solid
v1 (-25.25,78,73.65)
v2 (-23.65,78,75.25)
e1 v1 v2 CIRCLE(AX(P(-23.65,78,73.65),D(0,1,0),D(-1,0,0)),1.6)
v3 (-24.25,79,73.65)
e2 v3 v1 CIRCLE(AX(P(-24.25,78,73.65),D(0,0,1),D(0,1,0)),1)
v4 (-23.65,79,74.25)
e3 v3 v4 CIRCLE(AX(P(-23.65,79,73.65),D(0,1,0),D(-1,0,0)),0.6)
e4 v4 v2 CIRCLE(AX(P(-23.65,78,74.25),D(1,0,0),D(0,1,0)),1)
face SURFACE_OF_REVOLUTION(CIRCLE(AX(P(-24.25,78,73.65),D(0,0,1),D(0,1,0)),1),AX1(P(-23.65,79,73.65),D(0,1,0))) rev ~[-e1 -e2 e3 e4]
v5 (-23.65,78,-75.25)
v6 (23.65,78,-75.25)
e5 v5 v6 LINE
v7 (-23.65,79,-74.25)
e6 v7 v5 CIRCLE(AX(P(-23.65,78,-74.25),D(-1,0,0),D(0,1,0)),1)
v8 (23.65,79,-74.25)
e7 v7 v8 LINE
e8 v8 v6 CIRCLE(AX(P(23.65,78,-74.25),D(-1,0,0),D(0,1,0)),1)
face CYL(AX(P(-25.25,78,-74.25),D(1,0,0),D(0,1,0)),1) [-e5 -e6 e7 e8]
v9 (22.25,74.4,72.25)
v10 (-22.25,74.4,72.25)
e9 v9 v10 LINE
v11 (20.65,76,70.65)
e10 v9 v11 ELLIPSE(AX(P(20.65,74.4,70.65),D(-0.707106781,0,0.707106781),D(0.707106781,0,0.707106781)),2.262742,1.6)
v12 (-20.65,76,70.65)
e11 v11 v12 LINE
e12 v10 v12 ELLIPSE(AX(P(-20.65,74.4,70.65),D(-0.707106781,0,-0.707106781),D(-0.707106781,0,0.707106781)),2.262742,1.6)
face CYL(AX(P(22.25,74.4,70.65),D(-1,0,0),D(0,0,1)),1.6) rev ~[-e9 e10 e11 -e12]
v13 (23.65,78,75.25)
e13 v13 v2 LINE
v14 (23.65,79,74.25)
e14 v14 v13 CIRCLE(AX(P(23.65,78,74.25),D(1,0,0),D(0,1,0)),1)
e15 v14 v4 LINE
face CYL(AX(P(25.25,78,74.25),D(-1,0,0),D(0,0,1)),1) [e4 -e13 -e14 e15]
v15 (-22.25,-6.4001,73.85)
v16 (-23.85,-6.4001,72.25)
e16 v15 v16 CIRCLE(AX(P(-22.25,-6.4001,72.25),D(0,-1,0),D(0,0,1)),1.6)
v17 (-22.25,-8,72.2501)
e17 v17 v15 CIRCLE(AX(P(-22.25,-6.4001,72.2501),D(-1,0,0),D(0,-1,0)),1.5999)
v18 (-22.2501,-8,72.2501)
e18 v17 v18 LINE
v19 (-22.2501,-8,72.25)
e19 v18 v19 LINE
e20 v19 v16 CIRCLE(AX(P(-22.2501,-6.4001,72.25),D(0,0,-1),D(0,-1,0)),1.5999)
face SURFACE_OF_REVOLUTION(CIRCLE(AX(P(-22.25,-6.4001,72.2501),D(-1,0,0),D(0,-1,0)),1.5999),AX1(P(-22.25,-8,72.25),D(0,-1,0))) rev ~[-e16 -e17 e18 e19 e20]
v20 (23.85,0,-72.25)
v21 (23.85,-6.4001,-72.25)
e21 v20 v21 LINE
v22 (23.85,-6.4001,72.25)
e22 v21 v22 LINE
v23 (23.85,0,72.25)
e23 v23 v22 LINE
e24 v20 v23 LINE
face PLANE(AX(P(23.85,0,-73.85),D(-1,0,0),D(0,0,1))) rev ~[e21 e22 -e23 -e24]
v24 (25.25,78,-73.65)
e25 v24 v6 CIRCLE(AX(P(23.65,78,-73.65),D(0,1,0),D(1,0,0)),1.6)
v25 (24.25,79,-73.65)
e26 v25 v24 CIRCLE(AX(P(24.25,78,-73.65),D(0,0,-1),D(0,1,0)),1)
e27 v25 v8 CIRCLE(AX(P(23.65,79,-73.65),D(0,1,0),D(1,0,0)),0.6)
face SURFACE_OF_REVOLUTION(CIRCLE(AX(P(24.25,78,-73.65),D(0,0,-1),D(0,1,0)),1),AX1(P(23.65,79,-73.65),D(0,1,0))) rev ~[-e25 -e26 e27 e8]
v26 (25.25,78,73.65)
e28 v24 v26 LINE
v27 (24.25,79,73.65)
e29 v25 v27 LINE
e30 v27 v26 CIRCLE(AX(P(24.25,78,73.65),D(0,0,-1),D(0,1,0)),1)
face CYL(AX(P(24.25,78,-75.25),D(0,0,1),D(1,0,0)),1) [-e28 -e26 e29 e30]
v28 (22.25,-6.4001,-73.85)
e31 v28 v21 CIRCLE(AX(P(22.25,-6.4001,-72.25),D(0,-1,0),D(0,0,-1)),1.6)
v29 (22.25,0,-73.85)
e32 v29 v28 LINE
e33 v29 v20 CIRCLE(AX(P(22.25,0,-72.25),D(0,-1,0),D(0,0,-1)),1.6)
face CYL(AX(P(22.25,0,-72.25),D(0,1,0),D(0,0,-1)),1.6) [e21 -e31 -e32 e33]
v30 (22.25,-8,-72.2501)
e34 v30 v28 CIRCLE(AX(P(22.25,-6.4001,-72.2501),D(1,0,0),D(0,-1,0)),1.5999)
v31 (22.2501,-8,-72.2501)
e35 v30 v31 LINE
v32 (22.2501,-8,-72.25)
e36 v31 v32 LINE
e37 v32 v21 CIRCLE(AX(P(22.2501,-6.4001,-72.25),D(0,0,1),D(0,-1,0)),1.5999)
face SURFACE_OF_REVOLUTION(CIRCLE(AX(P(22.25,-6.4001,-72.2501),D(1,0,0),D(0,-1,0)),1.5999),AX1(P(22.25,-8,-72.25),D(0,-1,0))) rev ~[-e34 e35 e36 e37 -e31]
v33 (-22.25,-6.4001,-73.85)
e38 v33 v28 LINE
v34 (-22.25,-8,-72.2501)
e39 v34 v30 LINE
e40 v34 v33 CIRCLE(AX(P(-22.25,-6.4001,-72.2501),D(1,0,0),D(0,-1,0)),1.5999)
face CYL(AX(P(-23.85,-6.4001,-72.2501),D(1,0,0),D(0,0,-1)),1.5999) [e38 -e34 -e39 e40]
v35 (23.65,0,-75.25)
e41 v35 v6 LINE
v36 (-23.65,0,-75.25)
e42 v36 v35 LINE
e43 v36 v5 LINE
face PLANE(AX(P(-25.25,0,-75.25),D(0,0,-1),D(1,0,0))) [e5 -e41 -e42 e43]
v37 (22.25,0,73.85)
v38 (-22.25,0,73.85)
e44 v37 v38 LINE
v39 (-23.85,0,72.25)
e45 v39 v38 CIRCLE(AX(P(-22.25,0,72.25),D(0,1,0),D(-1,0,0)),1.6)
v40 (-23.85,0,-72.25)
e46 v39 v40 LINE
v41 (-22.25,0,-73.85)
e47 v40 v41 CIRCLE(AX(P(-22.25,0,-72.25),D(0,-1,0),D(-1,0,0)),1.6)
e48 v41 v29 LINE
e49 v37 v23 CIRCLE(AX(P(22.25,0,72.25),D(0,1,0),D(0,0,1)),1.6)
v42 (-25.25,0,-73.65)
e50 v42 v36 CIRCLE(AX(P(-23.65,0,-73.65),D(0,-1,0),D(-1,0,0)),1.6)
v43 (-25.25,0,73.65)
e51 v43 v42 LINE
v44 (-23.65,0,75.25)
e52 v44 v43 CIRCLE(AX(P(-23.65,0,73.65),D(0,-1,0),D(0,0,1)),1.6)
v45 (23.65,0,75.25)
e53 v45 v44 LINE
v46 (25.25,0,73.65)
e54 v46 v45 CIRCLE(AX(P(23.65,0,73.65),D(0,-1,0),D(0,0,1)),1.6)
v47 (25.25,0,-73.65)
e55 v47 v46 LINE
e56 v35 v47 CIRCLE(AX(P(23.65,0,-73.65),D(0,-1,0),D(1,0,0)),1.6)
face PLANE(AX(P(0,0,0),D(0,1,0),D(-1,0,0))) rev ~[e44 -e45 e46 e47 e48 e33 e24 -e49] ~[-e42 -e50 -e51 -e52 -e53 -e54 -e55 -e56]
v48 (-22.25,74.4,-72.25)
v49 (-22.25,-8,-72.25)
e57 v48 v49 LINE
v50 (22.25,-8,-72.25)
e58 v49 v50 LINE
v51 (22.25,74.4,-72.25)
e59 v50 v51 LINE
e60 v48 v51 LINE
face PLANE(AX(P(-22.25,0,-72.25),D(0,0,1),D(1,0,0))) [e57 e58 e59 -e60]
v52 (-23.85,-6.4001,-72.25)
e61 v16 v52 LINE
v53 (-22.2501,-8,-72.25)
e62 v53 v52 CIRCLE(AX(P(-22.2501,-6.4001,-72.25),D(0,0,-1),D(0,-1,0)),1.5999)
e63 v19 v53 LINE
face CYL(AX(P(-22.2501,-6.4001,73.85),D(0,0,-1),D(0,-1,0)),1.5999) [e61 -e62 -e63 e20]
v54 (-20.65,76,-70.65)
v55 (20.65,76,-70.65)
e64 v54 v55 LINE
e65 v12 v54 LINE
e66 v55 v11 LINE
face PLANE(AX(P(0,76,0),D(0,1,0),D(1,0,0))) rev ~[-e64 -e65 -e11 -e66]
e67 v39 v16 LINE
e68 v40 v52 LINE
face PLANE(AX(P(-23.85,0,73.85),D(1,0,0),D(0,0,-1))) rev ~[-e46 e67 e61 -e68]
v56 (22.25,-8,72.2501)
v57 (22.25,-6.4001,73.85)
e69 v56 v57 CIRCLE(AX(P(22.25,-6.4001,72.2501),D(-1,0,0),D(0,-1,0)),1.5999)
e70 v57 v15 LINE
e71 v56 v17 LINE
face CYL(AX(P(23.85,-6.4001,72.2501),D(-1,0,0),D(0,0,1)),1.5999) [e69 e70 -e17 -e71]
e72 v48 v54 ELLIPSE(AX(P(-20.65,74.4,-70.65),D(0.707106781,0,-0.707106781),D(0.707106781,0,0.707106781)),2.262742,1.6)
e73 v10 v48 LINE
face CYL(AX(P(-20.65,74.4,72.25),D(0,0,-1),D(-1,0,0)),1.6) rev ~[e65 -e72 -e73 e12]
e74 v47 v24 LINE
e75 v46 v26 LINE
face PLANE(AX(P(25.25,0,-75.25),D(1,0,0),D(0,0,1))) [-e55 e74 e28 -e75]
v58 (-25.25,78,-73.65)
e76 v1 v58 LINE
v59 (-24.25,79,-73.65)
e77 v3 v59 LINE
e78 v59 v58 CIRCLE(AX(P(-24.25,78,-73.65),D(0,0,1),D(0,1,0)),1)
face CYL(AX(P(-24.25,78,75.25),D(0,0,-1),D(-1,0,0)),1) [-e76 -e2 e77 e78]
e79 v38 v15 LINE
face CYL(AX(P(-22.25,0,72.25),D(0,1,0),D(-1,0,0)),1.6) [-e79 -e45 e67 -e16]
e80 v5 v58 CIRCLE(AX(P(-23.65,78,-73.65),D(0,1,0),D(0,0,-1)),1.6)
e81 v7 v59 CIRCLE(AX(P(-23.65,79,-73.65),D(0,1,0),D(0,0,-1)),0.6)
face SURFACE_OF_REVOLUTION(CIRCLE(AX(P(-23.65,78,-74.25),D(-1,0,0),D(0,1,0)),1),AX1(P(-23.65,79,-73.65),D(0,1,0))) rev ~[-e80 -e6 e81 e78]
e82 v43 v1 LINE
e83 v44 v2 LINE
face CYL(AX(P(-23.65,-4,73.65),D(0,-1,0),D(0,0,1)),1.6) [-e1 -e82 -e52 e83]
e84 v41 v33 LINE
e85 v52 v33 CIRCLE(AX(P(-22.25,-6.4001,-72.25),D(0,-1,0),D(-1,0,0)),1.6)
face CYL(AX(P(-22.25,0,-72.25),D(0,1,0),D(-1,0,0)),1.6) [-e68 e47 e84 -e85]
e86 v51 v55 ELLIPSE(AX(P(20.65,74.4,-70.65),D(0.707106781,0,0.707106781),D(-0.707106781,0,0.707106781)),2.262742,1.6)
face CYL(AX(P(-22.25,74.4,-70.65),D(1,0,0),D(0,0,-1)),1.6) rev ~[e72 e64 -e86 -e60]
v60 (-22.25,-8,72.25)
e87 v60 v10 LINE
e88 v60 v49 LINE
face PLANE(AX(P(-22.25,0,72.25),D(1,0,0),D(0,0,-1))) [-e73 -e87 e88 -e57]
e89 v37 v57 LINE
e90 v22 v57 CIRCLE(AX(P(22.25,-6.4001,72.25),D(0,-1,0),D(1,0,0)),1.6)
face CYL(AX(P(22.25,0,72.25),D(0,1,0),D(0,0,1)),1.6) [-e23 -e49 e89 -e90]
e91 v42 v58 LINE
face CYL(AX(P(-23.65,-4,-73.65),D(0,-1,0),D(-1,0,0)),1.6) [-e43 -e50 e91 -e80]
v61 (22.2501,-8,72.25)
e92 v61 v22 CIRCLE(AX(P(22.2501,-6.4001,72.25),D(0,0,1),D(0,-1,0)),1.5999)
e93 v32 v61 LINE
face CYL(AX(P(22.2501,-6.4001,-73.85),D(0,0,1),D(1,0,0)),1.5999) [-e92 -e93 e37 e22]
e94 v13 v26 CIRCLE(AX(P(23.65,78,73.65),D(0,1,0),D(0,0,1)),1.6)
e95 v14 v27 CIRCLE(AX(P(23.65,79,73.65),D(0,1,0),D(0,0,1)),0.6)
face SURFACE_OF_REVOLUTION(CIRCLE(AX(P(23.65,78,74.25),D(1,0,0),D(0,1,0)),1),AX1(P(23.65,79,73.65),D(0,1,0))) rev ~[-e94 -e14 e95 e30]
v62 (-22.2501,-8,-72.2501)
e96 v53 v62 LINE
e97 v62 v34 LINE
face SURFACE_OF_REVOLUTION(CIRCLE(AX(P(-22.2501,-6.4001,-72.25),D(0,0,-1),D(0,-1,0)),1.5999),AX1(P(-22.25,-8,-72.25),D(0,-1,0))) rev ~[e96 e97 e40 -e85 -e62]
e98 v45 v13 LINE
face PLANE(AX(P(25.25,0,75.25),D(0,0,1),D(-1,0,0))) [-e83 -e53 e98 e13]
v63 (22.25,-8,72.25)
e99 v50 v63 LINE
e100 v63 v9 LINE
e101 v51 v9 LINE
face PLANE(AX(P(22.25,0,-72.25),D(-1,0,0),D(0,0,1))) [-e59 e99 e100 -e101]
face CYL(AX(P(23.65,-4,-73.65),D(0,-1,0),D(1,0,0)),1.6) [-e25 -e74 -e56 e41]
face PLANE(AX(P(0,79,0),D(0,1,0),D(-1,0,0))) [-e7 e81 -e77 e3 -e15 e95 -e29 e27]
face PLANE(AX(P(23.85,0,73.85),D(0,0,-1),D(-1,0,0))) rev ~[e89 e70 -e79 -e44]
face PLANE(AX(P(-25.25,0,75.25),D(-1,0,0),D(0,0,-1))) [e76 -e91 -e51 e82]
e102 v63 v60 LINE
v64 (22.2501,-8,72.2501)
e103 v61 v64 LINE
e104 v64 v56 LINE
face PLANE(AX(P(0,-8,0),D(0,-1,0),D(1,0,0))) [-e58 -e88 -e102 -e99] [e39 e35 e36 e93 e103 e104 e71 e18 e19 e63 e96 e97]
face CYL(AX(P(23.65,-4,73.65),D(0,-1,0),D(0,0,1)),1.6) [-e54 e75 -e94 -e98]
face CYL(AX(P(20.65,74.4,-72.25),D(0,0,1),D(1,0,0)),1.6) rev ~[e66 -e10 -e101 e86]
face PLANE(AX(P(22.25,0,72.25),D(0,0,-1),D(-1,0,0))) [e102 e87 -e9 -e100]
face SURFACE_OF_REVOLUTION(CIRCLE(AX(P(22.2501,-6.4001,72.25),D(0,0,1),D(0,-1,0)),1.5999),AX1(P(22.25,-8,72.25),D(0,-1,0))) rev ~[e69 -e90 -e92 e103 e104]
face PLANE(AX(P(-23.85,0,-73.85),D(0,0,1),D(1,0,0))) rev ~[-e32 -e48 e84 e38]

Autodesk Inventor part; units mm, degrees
ref_plane "YZ Plane" through (0, 0, 0) normal (1, 0, 0) x (0, 1, 0)
ref_plane "XZ Plane" through (0, 0, 0) normal (0, 1, 0) x (-1, 0, 0)
ref_plane "XY Plane" through (0, 0, 0) normal (0, 0, 1) x (1, 0, 0)
sketch "Boceto1" plane through (0, 0, 0) normal (0, 1, 0) x (-1, 0, 0)
  line L0 (-25.25, 75.25) -> (25.25, 75.25)
  line L1 (25.25, 75.25) -> (25.25, -75.25)
  line L2 (25.25, -75.25) -> (-25.25, -75.25)
  line L3 (-25.25, -75.25) -> (-25.25, 75.25)
  line L4 (-25.25, 75.25) -> (25.25, -75.25) construction
  line L5 (25.25, 75.25) -> (-25.25, -75.25) construction
  line L6 (22.25, -72.25) -> (22.25, 72.25)
  line L7 (22.25, 72.25) -> (-22.25, 72.25)
  line L8 (-22.25, 72.25) -> (-22.25, -72.25)
  line L9 (-22.25, -72.25) -> (22.25, -72.25)
  point P0 (0, 0)
  dimension "d0" = 50.5
  dimension "d1" = 150.5
  dimension "d2" = 3
  dimension "d3" = 44.5
extrude "Extrusión1" add sketch "Boceto1" along normal blind 79
sketch "Boceto2" plane through (0, 79, 0) normal (0, 1, 0) x (1, 0, 0)
  line L0 (-22.25, -72.25) -> (-22.25, 72.25) projected
  line L1 (25.25, 75.25) -> (-25.25, 75.25) projected
  line L2 (-25.25, 75.25) -> (-25.25, -75.25) projected
  line L3 (-25.25, -75.25) -> (25.25, -75.25) projected
  line L4 (25.25, -75.25) -> (25.25, 75.25) projected
  line L5 (-22.25, 72.25) -> (22.25, 72.25) projected
  line L6 (22.25, 72.25) -> (22.25, -72.25) projected
  line L7 (22.25, -72.25) -> (-22.25, -72.25) projected
  line L8 (-22.25, -72.25) -> (-22.25, 72.25) projected
  point P0 (0, 0)
  point P1 (-22.25, 72.25)
extrude "Extrusión2" add sketch "Boceto2" against normal blind 3 contours L0 L5 L6 L7
fillet "Empalme1" radius 1 4 edges at (0, 79, 75.25) (25.25, 79, 0) (-25.25, 79, 0) (0, 79, -75.25)
sketch "Boceto3" plane through (0, 0, 0) normal (0, -1, 0) x (1, 0, 0)
  line L0 (25.25, -75.25) -> (-25.25, -75.25) projected
  line L1 (25.25, 75.25) -> (25.25, -75.25) projected
  line L2 (-25.25, 75.25) -> (25.25, 75.25) projected
  line L3 (-25.25, -75.25) -> (-25.25, 75.25) projected
  line L4 (-22.25, -72.25) -> (22.25, -72.25) projected
  line L5 (-22.25, 72.25) -> (-22.25, -72.25) projected
  line L6 (22.25, 72.25) -> (-22.25, 72.25) projected
  line L7 (22.25, -72.25) -> (22.25, 72.25) projected
  line L8 (23.85, 73.85) -> (-23.85, 73.85)
  line L9 (-23.85, 73.85) -> (-23.85, -73.85)
  line L10 (-23.85, -73.85) -> (23.85, -73.85)
  line L11 (23.85, -73.85) -> (23.85, 73.85)
  point P0 (0, 0)
  dimension "d9" = 1.6
extrude "Extrusión3" add sketch "Boceto3" along normal blind 8 contours L11 L10 L9 L8
fillet "Empalme2" radius 1.6 4 edges at (-23.85, -8, 0) (0, -8, 73.85) (23.85, -8, 0) (0, -8, -73.85)
fillet "Empalme3" radius 1.6 4 edges at (22.25, 76, 0) (0, 76, 72.25) (0, 76, -72.25) (-22.25, 76, 0)
fillet "Empalme4" radius 1.6 16 edges at (-24.9571, 78.7071, 74.9571) (-25.25, 39, 75.25) (24.9571, 78.7071, 74.9571) (25.25, 39, 75.25) (-24.9571, 78.7071, -74.9571) (-25.25, 39, -75.25) (24.9571, 78.7071, -74.9571) (25.25, 39, -75.25) (-23.3814, -7.5314, -73.3814) (-23.85, -3.2001, -73.85) (23.3814, -7.5314, -73.3814) (23.85, -3.2001, -73.85) (-23.3814, -7.5314, 73.3814) (-23.85, -3.2001, 73.85) (23.3814, -7.5314, 73.3814) (23.85, -3.2001, 73.85)
properties part number "Caja bateria"
